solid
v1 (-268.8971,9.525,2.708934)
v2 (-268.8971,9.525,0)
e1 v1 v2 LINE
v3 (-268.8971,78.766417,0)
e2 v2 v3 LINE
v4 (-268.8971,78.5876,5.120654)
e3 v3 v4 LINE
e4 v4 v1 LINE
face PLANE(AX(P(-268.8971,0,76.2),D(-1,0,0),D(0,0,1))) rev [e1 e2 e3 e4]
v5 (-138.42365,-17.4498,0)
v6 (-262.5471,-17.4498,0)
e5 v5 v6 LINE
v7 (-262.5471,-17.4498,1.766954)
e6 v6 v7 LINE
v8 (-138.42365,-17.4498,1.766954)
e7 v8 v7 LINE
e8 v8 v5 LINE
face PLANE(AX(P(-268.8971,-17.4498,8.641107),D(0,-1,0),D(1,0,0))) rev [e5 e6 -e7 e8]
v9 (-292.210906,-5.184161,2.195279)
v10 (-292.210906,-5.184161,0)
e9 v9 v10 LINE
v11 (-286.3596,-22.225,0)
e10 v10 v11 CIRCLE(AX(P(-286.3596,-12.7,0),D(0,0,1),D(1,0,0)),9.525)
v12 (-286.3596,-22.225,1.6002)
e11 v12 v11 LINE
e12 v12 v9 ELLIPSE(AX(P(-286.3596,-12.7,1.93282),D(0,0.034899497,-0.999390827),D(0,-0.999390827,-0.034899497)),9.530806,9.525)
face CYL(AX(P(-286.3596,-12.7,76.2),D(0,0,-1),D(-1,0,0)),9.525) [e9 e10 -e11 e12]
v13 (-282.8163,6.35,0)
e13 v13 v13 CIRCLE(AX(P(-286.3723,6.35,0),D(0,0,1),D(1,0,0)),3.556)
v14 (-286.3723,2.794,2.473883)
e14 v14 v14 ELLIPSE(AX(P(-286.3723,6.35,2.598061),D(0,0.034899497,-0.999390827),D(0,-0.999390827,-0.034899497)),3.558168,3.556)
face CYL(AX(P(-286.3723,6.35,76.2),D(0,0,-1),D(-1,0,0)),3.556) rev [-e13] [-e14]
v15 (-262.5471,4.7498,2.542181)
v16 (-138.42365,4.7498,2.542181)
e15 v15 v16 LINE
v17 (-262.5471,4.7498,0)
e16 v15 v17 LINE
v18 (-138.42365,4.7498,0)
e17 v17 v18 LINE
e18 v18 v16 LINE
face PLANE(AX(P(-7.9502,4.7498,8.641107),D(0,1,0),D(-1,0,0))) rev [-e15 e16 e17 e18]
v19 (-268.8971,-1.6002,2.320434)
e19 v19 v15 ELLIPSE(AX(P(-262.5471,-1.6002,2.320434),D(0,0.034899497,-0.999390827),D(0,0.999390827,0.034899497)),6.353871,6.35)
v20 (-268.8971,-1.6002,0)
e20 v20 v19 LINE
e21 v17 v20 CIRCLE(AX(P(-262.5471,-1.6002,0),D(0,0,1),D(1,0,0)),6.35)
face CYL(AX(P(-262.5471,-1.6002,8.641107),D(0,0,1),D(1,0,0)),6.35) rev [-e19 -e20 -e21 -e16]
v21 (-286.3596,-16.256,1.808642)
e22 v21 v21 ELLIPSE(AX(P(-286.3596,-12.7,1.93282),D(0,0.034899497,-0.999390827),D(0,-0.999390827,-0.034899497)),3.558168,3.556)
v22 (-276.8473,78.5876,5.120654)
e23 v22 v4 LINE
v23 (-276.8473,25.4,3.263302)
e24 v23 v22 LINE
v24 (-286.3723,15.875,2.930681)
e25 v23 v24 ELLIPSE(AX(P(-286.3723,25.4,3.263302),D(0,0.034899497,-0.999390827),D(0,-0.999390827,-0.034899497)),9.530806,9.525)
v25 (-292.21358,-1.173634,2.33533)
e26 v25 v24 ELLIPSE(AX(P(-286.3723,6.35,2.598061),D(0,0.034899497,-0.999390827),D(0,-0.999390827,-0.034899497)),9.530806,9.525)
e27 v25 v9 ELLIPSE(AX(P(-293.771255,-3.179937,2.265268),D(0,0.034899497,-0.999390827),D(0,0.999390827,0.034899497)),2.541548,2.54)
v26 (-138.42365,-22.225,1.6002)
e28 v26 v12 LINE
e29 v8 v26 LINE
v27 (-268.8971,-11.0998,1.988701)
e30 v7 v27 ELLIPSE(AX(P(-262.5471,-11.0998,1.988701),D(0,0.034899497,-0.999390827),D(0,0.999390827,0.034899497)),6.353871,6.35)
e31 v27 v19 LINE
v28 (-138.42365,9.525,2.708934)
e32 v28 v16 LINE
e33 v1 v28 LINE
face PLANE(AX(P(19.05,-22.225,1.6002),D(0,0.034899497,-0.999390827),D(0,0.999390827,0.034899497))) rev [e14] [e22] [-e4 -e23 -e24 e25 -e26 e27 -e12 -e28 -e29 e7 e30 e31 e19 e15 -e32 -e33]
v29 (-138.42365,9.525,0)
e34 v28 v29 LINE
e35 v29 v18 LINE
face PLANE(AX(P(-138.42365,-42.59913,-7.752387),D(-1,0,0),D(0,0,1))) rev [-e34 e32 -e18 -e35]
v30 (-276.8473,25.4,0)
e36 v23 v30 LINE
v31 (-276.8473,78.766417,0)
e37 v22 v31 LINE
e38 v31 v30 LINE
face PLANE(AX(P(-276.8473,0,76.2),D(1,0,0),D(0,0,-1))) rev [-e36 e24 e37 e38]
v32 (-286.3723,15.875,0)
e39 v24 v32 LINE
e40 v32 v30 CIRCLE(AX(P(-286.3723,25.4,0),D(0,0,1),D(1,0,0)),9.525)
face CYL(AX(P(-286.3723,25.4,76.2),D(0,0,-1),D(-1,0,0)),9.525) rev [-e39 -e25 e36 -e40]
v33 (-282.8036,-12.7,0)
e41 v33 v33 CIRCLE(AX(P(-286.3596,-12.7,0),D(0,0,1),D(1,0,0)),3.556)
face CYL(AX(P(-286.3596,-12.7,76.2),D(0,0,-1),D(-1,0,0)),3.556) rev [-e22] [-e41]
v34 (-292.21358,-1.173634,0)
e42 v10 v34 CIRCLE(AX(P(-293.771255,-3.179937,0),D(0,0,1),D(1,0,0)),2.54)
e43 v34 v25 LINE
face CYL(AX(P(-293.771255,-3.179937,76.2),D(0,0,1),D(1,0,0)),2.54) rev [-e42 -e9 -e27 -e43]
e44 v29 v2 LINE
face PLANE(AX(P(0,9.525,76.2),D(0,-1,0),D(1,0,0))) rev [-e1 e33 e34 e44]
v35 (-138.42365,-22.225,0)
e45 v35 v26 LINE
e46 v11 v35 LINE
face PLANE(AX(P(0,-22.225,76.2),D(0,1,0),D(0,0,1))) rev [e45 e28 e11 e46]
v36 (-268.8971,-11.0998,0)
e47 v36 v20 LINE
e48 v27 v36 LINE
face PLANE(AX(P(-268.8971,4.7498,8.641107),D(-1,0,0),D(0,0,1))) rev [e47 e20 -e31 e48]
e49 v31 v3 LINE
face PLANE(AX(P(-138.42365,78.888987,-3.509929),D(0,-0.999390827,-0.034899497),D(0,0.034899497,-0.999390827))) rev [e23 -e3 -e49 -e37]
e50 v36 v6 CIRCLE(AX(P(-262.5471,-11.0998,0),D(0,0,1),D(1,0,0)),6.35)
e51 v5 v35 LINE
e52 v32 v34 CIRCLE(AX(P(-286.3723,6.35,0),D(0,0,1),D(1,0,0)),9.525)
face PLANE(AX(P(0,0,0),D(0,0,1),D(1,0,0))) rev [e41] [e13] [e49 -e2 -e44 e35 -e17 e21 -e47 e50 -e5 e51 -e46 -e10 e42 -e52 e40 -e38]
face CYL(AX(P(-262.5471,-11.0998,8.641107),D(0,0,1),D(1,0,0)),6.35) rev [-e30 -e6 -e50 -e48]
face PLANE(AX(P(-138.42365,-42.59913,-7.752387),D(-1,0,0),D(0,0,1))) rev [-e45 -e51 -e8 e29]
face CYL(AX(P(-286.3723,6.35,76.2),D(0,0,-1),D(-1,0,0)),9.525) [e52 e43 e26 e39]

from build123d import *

# Parameters (mm, degrees)
BOSS_EXTRUDE1_OUTLINE_R = 3.556
BOSS_EXTRUDE1_OUTLINE_W = 260.9469
BOSS_EXTRUDE1_OUTLINE_H = 138.1252
BOSS_EXTRUDE1_DEPTH     = 76.2
CUT_EXTRUDE1_DEPTH      = 355.32482824
CUT_EXTRUDE1_DEPTH_BACK = 355.32482824
FILLET1_R               = 2.54
SKETCH7_W               = 260.9469
SKETCH7_H               = 22.1996
CUT_EXTRUDE2_DEPTH      = 347.152897849
FILLET2_R               = 6.35
SKETCH8_W               = 217.439036591
SKETCH8_H               = 235.521960295
CUT_EXTRUDE4_DEPTH      = 347.144751077
SKETCH9_W               = 205.813387363
SKETCH9_H               = 113.418104201
CUT_EXTRUDE5_DEPTH      = 347.144751077


# Read off the part's stored shape, not the designer's step: Boss-Extrude1
with BuildPart() as part:
    # Boss-Extrude1 outline → Boss-Extrude1 (new body)
    with BuildSketch(Plane.XY):
        with BuildLine():
            Line((-286.3596, -22.225), (9.525, -22.225))
            ThreePointArc((9.525, -22.225), (19.05, -12.7), (9.525, -3.175))
            ThreePointArc((9.525, -3.175), (19.05, 6.35), (9.525, 15.875))
            ThreePointArc((9.525, 15.875), (2.789807909, 18.664807909), (0, 25.4))
            Line((0, 25.4), (0, 131.7752))
            ThreePointArc((0, 131.7752), (2.789807909, 138.510392091), (9.525, 141.3002))
            ThreePointArc((9.525, 141.3002), (19.05, 150.8252), (9.525, 160.3502))
            ThreePointArc((9.525, 160.3502), (19.05, 169.8752), (9.525, 179.4002))
            Line((9.525, 179.4002), (-6.35, 179.4002))
            Line((-6.35, 179.4002), (-6.35, 163.5252))
            Line((-6.35, 163.5252), (-7.9502, 163.5252))
            Line((-7.9502, 163.5252), (-7.9502, 160.3502))
            Line((-7.9502, 160.3502), (-268.9098, 160.3502))
            Line((-268.9098, 160.3502), (-268.9098, 163.5252))
            Line((-268.9098, 163.5252), (-270.51, 163.5252))
            Line((-270.51, 163.5252), (-270.51, 179.4002))
            Line((-270.51, 179.4002), (-286.385, 179.4002))
            ThreePointArc((-286.385, 179.4002), (-295.91, 169.8752), (-286.385, 160.3502))
            ThreePointArc((-286.385, 160.3502), (-295.897297883, 150.818850004), (-286.3723, 141.3002))
            ThreePointArc((-286.3723, 141.3002), (-279.637107909, 138.510392091), (-276.8473, 131.7752))
            Line((-276.8473, 131.7752), (-276.8473, 25.4))
            ThreePointArc((-276.8473, 25.4), (-279.637107909, 18.664807909), (-286.3723, 15.875))
            ThreePointArc((-286.3723, 15.875), (-295.8973, 6.35), (-286.3723, -3.175))
            ThreePointArc((-286.3723, -3.175), (-295.884597883, -12.706349996), (-286.3596, -22.225))
        make_face()
        with Locations((-286.3596, -12.7)):
            Circle(BOSS_EXTRUDE1_OUTLINE_R, mode=Mode.SUBTRACT)
        with Locations((-286.3723, 6.35)):
            Circle(BOSS_EXTRUDE1_OUTLINE_R, mode=Mode.SUBTRACT)
        with Locations((9.525, -12.7)):
            Circle(BOSS_EXTRUDE1_OUTLINE_R, mode=Mode.SUBTRACT)
        with Locations((9.525, 6.35)):
            Circle(BOSS_EXTRUDE1_OUTLINE_R, mode=Mode.SUBTRACT)
        with Locations((-286.3723, 150.8252)):
            Circle(BOSS_EXTRUDE1_OUTLINE_R, mode=Mode.SUBTRACT)
        with Locations((-286.385, 169.8752)):
            Circle(BOSS_EXTRUDE1_OUTLINE_R, mode=Mode.SUBTRACT)
        with Locations((-138.42365, 78.5876)):
            Rectangle(BOSS_EXTRUDE1_OUTLINE_W, BOSS_EXTRUDE1_OUTLINE_H, mode=Mode.SUBTRACT)
        with Locations((9.525, 150.8252)):
            Circle(BOSS_EXTRUDE1_OUTLINE_R, mode=Mode.SUBTRACT)
        with Locations((9.525, 169.8752)):
            Circle(BOSS_EXTRUDE1_OUTLINE_R, mode=Mode.SUBTRACT)
    extrude(amount=BOSS_EXTRUDE1_DEPTH)

    # Sketch5 → Cut-Extrude1 (cut, two sides: drawn at the far end of the back side and taken through both)
    with BuildSketch(Plane.ZY.offset(276.8473).offset(-CUT_EXTRUDE1_DEPTH_BACK)):
        Polygon((1.6002, -22.225), (8.641107133, 179.4002), (76.2, 179.4002), (76.2, -22.225), align=None)
    extrude(amount=CUT_EXTRUDE1_DEPTH + CUT_EXTRUDE1_DEPTH_BACK, mode=Mode.SUBTRACT)

    # Fillet1
    fillet1_edges = [part.edges().sort_by_distance(p)[0] for p in [
        (-286.385, 160.3502, 3.987933237),
        (-286.3723, -3.175, 1.132720329),
        (9.525, -3.175, 1.132720329),
        (9.525, 160.3502, 3.987933237),
    ]]
    fillet(fillet1_edges, radius=FILLET1_R)

    # Sketch7 → Cut-Extrude2 (cut, through all)
    with BuildSketch(Plane(origin=(0, 0, 0), x_dir=(-1, 0, 0), z_dir=(0, 0, -1))):
        with Locations((138.42365, -6.35)):
            Rectangle(SKETCH7_W, SKETCH7_H)
    extrude(amount=-CUT_EXTRUDE2_DEPTH, mode=Mode.SUBTRACT)

    # Fillet2
    fillet2_edges = [part.edges().sort_by_distance(p)[0] for p in [
        (-268.8971, 4.7498, 1.271090386),
        (-268.8971, -17.4498, 0.883476829),
        (-7.9502, -17.4498, 0.883476829),
        (-7.9502, 4.7498, 1.271090386),
    ]]
    fillet(fillet2_edges, radius=FILLET2_R)

    # Sketch8 → Cut-Extrude4 (cut, through all)
    with BuildSketch(Plane(origin=(0, -0.082881646, 2.373419811), x_dir=(1, 0, 0), z_dir=(0, -0.03489949670250444, 0.9993908270190958))):
        with Locations((-29.704131704, 74.917246318)):
            Rectangle(SKETCH8_W, SKETCH8_H)
    extrude(amount=-CUT_EXTRUDE4_DEPTH, mode=Mode.SUBTRACT)

    # Sketch9 → Cut-Extrude5 (cut, through all)
    with BuildSketch(Plane(origin=(0, -0.082881646, 2.373419811), x_dir=(1, 0, 0), z_dir=(0, -0.03489949670250444, 0.9993908270190958))):
        with Locations((-241.330343682, 135.427486891)):
            Rectangle(SKETCH9_W, SKETCH9_H)
    extrude(amount=-CUT_EXTRUDE5_DEPTH, mode=Mode.SUBTRACT)


solid = part.part
